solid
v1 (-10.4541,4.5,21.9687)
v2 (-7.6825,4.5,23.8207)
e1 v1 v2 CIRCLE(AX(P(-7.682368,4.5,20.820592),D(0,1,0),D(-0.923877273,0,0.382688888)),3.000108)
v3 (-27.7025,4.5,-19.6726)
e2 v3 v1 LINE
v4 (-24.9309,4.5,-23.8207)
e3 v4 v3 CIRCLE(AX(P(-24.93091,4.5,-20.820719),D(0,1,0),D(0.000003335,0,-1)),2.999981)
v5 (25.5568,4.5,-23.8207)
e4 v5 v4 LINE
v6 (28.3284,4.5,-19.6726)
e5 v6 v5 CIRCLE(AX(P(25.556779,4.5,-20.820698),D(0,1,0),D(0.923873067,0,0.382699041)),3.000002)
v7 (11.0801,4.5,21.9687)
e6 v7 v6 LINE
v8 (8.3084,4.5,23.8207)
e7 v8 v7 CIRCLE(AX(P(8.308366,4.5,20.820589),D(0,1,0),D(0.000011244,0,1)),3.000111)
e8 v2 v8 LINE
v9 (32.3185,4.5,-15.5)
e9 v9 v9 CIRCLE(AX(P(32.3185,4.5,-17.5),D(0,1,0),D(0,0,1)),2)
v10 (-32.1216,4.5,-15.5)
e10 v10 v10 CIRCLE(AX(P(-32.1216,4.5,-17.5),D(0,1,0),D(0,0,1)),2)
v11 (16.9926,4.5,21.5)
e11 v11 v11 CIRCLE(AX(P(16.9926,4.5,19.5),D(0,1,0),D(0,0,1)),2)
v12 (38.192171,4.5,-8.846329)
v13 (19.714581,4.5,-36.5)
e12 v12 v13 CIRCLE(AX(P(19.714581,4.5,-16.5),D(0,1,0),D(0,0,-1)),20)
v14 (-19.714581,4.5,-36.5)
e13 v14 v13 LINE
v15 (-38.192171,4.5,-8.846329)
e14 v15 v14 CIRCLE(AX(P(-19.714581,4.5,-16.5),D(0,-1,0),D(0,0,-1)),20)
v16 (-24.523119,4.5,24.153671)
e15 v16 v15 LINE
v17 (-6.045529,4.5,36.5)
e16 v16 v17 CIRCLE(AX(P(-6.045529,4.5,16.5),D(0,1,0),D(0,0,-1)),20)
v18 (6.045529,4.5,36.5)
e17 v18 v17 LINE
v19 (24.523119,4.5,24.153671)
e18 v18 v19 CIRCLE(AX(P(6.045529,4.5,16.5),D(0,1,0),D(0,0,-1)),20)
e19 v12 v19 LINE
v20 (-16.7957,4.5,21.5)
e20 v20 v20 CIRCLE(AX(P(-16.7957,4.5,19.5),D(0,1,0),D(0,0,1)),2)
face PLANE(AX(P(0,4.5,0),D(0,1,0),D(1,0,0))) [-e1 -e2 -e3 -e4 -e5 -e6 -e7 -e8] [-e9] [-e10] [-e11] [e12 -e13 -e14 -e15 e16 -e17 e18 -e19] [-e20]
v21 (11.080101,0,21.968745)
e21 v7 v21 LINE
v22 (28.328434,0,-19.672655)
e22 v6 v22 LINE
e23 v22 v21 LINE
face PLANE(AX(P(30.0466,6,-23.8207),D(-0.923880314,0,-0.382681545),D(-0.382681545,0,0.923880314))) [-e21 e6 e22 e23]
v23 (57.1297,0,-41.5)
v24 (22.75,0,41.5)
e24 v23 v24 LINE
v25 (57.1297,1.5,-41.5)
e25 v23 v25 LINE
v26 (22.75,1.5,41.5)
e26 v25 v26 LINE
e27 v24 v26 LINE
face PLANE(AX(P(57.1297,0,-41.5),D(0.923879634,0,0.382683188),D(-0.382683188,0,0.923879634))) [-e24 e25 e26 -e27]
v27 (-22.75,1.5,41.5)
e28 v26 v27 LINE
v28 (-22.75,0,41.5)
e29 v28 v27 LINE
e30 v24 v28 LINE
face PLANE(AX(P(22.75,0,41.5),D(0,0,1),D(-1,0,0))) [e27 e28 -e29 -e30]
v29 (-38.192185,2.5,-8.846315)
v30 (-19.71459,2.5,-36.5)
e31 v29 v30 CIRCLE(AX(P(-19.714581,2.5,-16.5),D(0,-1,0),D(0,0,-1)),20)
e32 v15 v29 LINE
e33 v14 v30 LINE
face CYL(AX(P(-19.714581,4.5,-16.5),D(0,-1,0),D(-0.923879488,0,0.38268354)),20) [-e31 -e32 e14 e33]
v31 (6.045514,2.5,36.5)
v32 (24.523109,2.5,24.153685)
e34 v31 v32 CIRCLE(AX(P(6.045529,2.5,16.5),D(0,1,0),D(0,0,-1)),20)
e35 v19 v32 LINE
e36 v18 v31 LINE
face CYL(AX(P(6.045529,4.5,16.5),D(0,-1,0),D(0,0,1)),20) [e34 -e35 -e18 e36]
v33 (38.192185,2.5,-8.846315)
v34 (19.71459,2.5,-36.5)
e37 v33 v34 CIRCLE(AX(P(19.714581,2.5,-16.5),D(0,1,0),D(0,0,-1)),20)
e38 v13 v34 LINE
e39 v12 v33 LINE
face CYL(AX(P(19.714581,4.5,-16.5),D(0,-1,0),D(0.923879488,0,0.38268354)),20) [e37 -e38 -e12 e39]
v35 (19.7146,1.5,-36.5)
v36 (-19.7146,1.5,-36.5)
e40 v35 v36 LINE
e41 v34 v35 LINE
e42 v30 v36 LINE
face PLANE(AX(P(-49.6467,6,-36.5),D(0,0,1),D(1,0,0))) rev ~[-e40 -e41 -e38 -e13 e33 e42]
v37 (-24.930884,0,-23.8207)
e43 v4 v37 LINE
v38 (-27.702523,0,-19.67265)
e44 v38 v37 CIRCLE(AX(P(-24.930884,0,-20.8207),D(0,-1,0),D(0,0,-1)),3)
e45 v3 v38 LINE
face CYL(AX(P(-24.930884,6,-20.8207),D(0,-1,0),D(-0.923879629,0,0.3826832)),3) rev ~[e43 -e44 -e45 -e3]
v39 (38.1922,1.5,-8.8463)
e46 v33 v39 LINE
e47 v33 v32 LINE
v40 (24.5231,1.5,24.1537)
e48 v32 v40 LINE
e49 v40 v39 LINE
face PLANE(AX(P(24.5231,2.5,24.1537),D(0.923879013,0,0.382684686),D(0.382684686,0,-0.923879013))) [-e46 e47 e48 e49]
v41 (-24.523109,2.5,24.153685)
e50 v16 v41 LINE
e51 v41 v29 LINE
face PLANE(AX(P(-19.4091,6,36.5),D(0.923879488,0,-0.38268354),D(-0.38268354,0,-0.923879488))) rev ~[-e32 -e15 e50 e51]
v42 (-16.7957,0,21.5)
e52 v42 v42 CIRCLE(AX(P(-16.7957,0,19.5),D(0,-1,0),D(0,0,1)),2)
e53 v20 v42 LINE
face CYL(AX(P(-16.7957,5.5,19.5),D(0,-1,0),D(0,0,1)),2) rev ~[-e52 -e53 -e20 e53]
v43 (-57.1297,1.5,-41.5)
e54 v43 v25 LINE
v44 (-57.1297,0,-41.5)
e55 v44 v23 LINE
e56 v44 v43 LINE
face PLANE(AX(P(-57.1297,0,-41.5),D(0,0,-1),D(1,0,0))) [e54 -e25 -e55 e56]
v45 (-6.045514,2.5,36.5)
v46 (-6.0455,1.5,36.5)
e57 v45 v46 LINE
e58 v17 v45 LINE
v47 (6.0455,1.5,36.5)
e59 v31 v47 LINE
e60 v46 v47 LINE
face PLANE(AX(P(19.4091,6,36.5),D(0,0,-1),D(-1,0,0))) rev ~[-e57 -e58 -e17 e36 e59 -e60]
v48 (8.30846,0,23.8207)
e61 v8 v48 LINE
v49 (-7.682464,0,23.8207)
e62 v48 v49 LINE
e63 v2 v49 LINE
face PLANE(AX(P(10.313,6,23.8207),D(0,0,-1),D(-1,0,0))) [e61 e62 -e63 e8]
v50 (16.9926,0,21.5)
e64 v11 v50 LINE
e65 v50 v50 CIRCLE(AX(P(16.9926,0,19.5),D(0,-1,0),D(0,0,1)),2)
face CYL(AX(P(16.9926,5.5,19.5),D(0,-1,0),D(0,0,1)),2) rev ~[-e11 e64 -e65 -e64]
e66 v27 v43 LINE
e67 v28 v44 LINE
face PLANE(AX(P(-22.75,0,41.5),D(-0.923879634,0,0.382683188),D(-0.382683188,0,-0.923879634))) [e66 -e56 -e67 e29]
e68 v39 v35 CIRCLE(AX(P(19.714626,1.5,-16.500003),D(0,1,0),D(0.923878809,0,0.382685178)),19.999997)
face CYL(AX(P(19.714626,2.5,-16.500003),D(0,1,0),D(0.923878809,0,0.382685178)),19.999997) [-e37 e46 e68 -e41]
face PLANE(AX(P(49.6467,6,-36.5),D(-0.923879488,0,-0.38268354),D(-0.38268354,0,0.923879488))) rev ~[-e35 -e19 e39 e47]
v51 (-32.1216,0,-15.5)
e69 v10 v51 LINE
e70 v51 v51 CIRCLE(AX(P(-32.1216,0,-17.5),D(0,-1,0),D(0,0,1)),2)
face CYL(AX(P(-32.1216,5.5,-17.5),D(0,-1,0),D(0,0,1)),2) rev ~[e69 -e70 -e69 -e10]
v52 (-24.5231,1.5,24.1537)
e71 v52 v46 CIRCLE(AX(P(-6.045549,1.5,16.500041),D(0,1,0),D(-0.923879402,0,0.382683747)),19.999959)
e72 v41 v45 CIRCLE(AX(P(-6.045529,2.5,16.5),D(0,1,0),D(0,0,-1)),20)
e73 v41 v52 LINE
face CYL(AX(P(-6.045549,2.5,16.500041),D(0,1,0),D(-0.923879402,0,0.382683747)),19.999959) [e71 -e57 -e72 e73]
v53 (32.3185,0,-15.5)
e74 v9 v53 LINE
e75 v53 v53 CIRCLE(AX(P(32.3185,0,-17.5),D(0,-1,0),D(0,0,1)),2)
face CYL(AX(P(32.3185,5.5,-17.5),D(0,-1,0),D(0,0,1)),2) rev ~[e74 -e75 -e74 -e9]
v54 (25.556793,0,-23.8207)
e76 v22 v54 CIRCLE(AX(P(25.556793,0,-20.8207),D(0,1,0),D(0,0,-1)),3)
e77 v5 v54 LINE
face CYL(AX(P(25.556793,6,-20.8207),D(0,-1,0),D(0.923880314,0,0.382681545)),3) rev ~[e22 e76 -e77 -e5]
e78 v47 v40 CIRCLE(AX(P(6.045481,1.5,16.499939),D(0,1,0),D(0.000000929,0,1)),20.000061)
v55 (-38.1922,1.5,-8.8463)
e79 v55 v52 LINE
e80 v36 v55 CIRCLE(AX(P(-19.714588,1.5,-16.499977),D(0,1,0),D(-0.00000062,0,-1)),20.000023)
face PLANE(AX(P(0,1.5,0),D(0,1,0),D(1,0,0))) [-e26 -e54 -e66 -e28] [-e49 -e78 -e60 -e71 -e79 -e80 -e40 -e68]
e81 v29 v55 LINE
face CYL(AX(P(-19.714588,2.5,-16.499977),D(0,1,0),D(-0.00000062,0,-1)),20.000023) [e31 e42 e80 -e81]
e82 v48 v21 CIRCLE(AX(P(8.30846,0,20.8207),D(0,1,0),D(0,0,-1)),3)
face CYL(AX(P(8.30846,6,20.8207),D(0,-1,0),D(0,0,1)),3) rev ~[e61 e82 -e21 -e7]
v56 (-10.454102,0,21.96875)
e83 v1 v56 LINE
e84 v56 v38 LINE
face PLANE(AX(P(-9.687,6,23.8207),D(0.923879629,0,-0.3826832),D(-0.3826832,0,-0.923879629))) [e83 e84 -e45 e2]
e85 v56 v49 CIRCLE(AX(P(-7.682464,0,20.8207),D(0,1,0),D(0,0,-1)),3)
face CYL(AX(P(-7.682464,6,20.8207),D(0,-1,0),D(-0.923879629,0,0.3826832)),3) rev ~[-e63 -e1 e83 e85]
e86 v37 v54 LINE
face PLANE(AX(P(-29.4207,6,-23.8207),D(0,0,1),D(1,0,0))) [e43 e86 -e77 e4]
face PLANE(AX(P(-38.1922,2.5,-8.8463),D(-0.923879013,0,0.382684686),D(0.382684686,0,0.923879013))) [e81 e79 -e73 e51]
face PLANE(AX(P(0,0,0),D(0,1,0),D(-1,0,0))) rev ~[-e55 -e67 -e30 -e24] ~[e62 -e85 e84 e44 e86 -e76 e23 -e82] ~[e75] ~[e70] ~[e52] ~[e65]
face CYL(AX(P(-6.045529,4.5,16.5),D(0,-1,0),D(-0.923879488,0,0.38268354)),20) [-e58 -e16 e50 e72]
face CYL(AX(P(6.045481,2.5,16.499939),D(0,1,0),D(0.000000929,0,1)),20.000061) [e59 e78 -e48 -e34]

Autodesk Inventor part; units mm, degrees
ref_plane "YZ Plane" through (0, 0, 0) normal (1, 0, 0) x (0, 1, 0)
ref_plane "XZ Plane" through (0, 0, 0) normal (0, 1, 0) x (-1, 0, 0)
ref_plane "XY Plane" through (0, 0, 0) normal (0, 0, 1) x (1, 0, 0)
sketch "Skizze1" plane through (0, 0, 0) normal (0, 1, 0) x (-1, 0, 0)
  line L0 (-22.75, 41.5) -> (22.75, 41.5)
  line L1 (22.75, 41.5) -> (57.1297, -41.5)
  line L2 (57.1297, -41.5) -> (-57.1297, -41.5)
  line L3 (-57.1297, -41.5) -> (-22.75, 41.5)
  line L4 (79.9816, 0) -> (-79.9816, 0) construction
  line L5 (0, -58.1) -> (0, 58.1) construction
  point P0 (0, 0)
  dimension "d0" = 83
  dimension "d1" = 112.5
  dimension "d2" = 45.5
extrude "Extrusion1" add sketch "Skizze1" along normal blind 6
sketch "Skizze2" plane through (0, 6, 0) normal (0, 1, 0) x (1, 0, 0)
  line L0 (-22.75, -41.5) -> (22.75, -41.5) projected
  line L1 (22.75, -41.5) -> (57.1297, 41.5) projected
  line L2 (57.1297, 41.5) -> (-57.1297, 41.5) projected
  line L3 (-57.1297, 41.5) -> (-22.75, -41.5) projected
  line L4 (-49.6467, 36.5) -> (49.6467, 36.5)
  line L5 (49.6467, 36.5) -> (19.4091, -36.5)
  line L6 (19.4091, -36.5) -> (-19.4091, -36.5)
  line L7 (-19.4091, -36.5) -> (-49.6467, 36.5)
  point P0 (0, 0)
  dimension "d5" = 5
extrude "Extrusion2" cut sketch "Skizze2" against normal blind 3.5
sketch "Skizze4" plane through (0, 6, 0) normal (0, 1, 0) x (1, 0, 0)
  line L0 (58.5766, 41.5) -> (-55.8797, 41.5) construction
  line L1 (-55.8797, 41.5) -> (-21.5, -41.5) construction
  line L2 (-21.5, -41.5) -> (24.1969, -41.5) construction
  line L3 (57.1297, 41.5) -> (22.75, -41.5) construction
  line L4 (22.4292, -40.7678) -> (56.8089, 42.2322) construction
  line L5 (-29.4207, 23.8207) -> (30.0466, 23.8207)
  line L6 (30.0466, 23.8207) -> (10.313, -23.8207)
  line L7 (10.313, -23.8207) -> (-9.687, -23.8207)
  line L8 (-9.687, -23.8207) -> (-29.4207, 23.8207)
  point P0 (0, 0)
  dimension "d15" = 20
extrude "Extrusion3" cut sketch "Skizze4" against normal through all
fillet "Rundung1" radius 3 4 edges at (30.0466, 3, -23.8207) (10.313, 3, 23.8207) (-9.687, 3, 23.8207) (-29.4207, 3, -23.8207)
sketch "Skizze5" plane through (0, 6, 0) normal (0, 1, 0) x (1, 0, 0)
  line L0 (-10.4541, -21.9687) -> (-27.7025, 19.6726) projected
  arc A0 (-24.9309, 23.8207) -> (-27.7025, 19.6726) centre (-24.9309, 20.8207) ccw projected
  line L1 (-24.9309, 23.8207) -> (25.5568, 23.8207) projected
  arc A1 (28.3284, 19.6726) -> (25.5568, 23.8207) centre (25.5568, 20.8207) ccw projected
  line L2 (28.3284, 19.6726) -> (11.0801, -21.9687) projected
  arc A2 (8.3084, -23.8207) -> (11.0801, -21.9687) centre (8.3084, -20.8207) ccw projected
  line L3 (8.3084, -23.8207) -> (-7.6825, -23.8207) projected
  arc A3 (-10.4541, -21.9687) -> (-7.6825, -23.8207) centre (-7.6825, -20.8207) ccw projected
  line L4 (-49.6467, 36.5) -> (-19.4091, -36.5) projected
  line L5 (-19.4091, -36.5) -> (19.4091, -36.5) projected
  line L6 (19.4091, -36.5) -> (49.6467, 36.5) projected
  line L7 (49.6467, 36.5) -> (-49.6467, 36.5) projected
  point P0 (0, 0)
extrude "Extrusion4" cut sketch "Skizze5" against normal blind 0.5
sketch "Skizze6" plane through (0, 5.5, 0) normal (0, 1, 0) x (1, 0, 0)
  circle A0 centre (-32.1216, 17.5) radius 4.7 construction
  circle A1 centre (-16.7957, -19.5) radius 4.7 construction
  circle A2 centre (16.9926, -19.5) radius 4.7 construction
  circle A3 centre (32.3185, 17.5) radius 4.7 construction
  line L0 (-24.9683, -43.2) -> (25.1652, -43.2) construction
  line L1 (25.1652, -43.2) -> (61.3675, 44.2) construction
  line L2 (61.3675, 44.2) -> (11.1438, 44.2) construction
  arc A4 (11.1438, 44.2) -> (-10.9469, 44.2) centre (0.0985, 34.5) ccw construction
  line L3 (-10.9469, 44.2) -> (-61.1705, 44.2) construction
  line L4 (-61.1705, 44.2) -> (-24.9683, -43.2) construction
  point P0 (0, 0)
  point P1 (-32.1216, 17.5)
  point P2 (-16.7957, -19.5)
  point P3 (16.9926, -19.5)
  point P4 (32.3185, 17.5)
hole "Bohrung2" at (-32.1216, 5.5, -17.5) at (-16.7957, 5.5, 19.5) at (16.9926, 5.5, 19.5) at (32.3185, 5.5, -17.5) direction (0, -1, 0) diameter 4 depth 8 tip angle 118
sketch "Skizze7" plane through (0, 5.5, 0) normal (0, 1, 0) x (1, 0, 0)
  circle A0 centre (16.9926, -19.5) radius 2 projected
  circle A1 centre (-32.1216, 17.5) radius 2 projected
  circle A2 centre (-16.7957, -19.5) radius 2 projected
  circle A3 centre (32.3185, 17.5) radius 2 projected
  arc A4 (-10.4541, -21.9687) -> (-7.6825, -23.8207) centre (-7.6825, -20.8207) ccw projected
  line L0 (-27.7025, 19.6726) -> (-10.4541, -21.9687) projected
  arc A5 (-24.9309, 23.8207) -> (-27.7025, 19.6726) centre (-24.9309, 20.8207) ccw projected
  line L1 (25.5568, 23.8207) -> (-24.9309, 23.8207) projected
  arc A6 (28.3284, 19.6726) -> (25.5568, 23.8207) centre (25.5568, 20.8207) ccw projected
  line L2 (11.0801, -21.9687) -> (28.3284, 19.6726) projected
  arc A7 (8.3084, -23.8207) -> (11.0801, -21.9687) centre (8.3084, -20.8207) ccw projected
  line L3 (-7.6825, -23.8207) -> (8.3084, -23.8207) projected
  line L4 (-19.4091, -36.5) -> (-49.6467, 36.5) projected
  line L5 (19.4091, -36.5) -> (-19.4091, -36.5) projected
  line L6 (49.6467, 36.5) -> (19.4091, -36.5) projected
  line L7 (-49.6467, 36.5) -> (49.6467, 36.5) projected
  point P0 (0, 0)
extrude "Extrusion5" cut sketch "Skizze7" against normal blind 1
fillet "Rundung2" radius 20 4 edges at (-19.4091, 3.5, 36.5) (19.4091, 3.5, 36.5) (49.6467, 3.5, -36.5) (-49.6467, 3.5, -36.5)
sketch "Skizze8" plane through (0, 2.5, 0) normal (0, 1, 0) x (1, 0, 0)
  line L0 (19.7146, 36.5) -> (-19.7146, 36.5) projected
  arc A0 (38.1922, 8.8463) -> (19.7146, 36.5) centre (19.7146, 16.5) ccw projected
  line L1 (24.5231, -24.1537) -> (38.1922, 8.8463) projected
  arc A1 (6.0455, -36.5) -> (24.5231, -24.1537) centre (6.0455, -16.5) ccw projected
  line L2 (-6.0455, -36.5) -> (6.0455, -36.5) projected
  arc A2 (-24.5231, -24.1537) -> (-6.0455, -36.5) centre (-6.0455, -16.5) ccw projected
  line L3 (-38.1922, 8.8463) -> (-24.5231, -24.1537) projected
  arc A3 (-19.7146, 36.5) -> (-38.1922, 8.8463) centre (-19.7146, 16.5) ccw projected
  line L4 (22.75, -41.5) -> (-22.75, -41.5) projected
  line L5 (57.1297, 41.5) -> (22.75, -41.5) projected
  line L6 (-57.1297, 41.5) -> (57.1297, 41.5) projected
  line L7 (-22.75, -41.5) -> (-57.1297, 41.5) projected
  point P0 (0, 0)
extrude "Extrusion6" cut sketch "Skizze8" against normal blind 1
properties part number "Stage2" material "ABS-Kunststoff"
